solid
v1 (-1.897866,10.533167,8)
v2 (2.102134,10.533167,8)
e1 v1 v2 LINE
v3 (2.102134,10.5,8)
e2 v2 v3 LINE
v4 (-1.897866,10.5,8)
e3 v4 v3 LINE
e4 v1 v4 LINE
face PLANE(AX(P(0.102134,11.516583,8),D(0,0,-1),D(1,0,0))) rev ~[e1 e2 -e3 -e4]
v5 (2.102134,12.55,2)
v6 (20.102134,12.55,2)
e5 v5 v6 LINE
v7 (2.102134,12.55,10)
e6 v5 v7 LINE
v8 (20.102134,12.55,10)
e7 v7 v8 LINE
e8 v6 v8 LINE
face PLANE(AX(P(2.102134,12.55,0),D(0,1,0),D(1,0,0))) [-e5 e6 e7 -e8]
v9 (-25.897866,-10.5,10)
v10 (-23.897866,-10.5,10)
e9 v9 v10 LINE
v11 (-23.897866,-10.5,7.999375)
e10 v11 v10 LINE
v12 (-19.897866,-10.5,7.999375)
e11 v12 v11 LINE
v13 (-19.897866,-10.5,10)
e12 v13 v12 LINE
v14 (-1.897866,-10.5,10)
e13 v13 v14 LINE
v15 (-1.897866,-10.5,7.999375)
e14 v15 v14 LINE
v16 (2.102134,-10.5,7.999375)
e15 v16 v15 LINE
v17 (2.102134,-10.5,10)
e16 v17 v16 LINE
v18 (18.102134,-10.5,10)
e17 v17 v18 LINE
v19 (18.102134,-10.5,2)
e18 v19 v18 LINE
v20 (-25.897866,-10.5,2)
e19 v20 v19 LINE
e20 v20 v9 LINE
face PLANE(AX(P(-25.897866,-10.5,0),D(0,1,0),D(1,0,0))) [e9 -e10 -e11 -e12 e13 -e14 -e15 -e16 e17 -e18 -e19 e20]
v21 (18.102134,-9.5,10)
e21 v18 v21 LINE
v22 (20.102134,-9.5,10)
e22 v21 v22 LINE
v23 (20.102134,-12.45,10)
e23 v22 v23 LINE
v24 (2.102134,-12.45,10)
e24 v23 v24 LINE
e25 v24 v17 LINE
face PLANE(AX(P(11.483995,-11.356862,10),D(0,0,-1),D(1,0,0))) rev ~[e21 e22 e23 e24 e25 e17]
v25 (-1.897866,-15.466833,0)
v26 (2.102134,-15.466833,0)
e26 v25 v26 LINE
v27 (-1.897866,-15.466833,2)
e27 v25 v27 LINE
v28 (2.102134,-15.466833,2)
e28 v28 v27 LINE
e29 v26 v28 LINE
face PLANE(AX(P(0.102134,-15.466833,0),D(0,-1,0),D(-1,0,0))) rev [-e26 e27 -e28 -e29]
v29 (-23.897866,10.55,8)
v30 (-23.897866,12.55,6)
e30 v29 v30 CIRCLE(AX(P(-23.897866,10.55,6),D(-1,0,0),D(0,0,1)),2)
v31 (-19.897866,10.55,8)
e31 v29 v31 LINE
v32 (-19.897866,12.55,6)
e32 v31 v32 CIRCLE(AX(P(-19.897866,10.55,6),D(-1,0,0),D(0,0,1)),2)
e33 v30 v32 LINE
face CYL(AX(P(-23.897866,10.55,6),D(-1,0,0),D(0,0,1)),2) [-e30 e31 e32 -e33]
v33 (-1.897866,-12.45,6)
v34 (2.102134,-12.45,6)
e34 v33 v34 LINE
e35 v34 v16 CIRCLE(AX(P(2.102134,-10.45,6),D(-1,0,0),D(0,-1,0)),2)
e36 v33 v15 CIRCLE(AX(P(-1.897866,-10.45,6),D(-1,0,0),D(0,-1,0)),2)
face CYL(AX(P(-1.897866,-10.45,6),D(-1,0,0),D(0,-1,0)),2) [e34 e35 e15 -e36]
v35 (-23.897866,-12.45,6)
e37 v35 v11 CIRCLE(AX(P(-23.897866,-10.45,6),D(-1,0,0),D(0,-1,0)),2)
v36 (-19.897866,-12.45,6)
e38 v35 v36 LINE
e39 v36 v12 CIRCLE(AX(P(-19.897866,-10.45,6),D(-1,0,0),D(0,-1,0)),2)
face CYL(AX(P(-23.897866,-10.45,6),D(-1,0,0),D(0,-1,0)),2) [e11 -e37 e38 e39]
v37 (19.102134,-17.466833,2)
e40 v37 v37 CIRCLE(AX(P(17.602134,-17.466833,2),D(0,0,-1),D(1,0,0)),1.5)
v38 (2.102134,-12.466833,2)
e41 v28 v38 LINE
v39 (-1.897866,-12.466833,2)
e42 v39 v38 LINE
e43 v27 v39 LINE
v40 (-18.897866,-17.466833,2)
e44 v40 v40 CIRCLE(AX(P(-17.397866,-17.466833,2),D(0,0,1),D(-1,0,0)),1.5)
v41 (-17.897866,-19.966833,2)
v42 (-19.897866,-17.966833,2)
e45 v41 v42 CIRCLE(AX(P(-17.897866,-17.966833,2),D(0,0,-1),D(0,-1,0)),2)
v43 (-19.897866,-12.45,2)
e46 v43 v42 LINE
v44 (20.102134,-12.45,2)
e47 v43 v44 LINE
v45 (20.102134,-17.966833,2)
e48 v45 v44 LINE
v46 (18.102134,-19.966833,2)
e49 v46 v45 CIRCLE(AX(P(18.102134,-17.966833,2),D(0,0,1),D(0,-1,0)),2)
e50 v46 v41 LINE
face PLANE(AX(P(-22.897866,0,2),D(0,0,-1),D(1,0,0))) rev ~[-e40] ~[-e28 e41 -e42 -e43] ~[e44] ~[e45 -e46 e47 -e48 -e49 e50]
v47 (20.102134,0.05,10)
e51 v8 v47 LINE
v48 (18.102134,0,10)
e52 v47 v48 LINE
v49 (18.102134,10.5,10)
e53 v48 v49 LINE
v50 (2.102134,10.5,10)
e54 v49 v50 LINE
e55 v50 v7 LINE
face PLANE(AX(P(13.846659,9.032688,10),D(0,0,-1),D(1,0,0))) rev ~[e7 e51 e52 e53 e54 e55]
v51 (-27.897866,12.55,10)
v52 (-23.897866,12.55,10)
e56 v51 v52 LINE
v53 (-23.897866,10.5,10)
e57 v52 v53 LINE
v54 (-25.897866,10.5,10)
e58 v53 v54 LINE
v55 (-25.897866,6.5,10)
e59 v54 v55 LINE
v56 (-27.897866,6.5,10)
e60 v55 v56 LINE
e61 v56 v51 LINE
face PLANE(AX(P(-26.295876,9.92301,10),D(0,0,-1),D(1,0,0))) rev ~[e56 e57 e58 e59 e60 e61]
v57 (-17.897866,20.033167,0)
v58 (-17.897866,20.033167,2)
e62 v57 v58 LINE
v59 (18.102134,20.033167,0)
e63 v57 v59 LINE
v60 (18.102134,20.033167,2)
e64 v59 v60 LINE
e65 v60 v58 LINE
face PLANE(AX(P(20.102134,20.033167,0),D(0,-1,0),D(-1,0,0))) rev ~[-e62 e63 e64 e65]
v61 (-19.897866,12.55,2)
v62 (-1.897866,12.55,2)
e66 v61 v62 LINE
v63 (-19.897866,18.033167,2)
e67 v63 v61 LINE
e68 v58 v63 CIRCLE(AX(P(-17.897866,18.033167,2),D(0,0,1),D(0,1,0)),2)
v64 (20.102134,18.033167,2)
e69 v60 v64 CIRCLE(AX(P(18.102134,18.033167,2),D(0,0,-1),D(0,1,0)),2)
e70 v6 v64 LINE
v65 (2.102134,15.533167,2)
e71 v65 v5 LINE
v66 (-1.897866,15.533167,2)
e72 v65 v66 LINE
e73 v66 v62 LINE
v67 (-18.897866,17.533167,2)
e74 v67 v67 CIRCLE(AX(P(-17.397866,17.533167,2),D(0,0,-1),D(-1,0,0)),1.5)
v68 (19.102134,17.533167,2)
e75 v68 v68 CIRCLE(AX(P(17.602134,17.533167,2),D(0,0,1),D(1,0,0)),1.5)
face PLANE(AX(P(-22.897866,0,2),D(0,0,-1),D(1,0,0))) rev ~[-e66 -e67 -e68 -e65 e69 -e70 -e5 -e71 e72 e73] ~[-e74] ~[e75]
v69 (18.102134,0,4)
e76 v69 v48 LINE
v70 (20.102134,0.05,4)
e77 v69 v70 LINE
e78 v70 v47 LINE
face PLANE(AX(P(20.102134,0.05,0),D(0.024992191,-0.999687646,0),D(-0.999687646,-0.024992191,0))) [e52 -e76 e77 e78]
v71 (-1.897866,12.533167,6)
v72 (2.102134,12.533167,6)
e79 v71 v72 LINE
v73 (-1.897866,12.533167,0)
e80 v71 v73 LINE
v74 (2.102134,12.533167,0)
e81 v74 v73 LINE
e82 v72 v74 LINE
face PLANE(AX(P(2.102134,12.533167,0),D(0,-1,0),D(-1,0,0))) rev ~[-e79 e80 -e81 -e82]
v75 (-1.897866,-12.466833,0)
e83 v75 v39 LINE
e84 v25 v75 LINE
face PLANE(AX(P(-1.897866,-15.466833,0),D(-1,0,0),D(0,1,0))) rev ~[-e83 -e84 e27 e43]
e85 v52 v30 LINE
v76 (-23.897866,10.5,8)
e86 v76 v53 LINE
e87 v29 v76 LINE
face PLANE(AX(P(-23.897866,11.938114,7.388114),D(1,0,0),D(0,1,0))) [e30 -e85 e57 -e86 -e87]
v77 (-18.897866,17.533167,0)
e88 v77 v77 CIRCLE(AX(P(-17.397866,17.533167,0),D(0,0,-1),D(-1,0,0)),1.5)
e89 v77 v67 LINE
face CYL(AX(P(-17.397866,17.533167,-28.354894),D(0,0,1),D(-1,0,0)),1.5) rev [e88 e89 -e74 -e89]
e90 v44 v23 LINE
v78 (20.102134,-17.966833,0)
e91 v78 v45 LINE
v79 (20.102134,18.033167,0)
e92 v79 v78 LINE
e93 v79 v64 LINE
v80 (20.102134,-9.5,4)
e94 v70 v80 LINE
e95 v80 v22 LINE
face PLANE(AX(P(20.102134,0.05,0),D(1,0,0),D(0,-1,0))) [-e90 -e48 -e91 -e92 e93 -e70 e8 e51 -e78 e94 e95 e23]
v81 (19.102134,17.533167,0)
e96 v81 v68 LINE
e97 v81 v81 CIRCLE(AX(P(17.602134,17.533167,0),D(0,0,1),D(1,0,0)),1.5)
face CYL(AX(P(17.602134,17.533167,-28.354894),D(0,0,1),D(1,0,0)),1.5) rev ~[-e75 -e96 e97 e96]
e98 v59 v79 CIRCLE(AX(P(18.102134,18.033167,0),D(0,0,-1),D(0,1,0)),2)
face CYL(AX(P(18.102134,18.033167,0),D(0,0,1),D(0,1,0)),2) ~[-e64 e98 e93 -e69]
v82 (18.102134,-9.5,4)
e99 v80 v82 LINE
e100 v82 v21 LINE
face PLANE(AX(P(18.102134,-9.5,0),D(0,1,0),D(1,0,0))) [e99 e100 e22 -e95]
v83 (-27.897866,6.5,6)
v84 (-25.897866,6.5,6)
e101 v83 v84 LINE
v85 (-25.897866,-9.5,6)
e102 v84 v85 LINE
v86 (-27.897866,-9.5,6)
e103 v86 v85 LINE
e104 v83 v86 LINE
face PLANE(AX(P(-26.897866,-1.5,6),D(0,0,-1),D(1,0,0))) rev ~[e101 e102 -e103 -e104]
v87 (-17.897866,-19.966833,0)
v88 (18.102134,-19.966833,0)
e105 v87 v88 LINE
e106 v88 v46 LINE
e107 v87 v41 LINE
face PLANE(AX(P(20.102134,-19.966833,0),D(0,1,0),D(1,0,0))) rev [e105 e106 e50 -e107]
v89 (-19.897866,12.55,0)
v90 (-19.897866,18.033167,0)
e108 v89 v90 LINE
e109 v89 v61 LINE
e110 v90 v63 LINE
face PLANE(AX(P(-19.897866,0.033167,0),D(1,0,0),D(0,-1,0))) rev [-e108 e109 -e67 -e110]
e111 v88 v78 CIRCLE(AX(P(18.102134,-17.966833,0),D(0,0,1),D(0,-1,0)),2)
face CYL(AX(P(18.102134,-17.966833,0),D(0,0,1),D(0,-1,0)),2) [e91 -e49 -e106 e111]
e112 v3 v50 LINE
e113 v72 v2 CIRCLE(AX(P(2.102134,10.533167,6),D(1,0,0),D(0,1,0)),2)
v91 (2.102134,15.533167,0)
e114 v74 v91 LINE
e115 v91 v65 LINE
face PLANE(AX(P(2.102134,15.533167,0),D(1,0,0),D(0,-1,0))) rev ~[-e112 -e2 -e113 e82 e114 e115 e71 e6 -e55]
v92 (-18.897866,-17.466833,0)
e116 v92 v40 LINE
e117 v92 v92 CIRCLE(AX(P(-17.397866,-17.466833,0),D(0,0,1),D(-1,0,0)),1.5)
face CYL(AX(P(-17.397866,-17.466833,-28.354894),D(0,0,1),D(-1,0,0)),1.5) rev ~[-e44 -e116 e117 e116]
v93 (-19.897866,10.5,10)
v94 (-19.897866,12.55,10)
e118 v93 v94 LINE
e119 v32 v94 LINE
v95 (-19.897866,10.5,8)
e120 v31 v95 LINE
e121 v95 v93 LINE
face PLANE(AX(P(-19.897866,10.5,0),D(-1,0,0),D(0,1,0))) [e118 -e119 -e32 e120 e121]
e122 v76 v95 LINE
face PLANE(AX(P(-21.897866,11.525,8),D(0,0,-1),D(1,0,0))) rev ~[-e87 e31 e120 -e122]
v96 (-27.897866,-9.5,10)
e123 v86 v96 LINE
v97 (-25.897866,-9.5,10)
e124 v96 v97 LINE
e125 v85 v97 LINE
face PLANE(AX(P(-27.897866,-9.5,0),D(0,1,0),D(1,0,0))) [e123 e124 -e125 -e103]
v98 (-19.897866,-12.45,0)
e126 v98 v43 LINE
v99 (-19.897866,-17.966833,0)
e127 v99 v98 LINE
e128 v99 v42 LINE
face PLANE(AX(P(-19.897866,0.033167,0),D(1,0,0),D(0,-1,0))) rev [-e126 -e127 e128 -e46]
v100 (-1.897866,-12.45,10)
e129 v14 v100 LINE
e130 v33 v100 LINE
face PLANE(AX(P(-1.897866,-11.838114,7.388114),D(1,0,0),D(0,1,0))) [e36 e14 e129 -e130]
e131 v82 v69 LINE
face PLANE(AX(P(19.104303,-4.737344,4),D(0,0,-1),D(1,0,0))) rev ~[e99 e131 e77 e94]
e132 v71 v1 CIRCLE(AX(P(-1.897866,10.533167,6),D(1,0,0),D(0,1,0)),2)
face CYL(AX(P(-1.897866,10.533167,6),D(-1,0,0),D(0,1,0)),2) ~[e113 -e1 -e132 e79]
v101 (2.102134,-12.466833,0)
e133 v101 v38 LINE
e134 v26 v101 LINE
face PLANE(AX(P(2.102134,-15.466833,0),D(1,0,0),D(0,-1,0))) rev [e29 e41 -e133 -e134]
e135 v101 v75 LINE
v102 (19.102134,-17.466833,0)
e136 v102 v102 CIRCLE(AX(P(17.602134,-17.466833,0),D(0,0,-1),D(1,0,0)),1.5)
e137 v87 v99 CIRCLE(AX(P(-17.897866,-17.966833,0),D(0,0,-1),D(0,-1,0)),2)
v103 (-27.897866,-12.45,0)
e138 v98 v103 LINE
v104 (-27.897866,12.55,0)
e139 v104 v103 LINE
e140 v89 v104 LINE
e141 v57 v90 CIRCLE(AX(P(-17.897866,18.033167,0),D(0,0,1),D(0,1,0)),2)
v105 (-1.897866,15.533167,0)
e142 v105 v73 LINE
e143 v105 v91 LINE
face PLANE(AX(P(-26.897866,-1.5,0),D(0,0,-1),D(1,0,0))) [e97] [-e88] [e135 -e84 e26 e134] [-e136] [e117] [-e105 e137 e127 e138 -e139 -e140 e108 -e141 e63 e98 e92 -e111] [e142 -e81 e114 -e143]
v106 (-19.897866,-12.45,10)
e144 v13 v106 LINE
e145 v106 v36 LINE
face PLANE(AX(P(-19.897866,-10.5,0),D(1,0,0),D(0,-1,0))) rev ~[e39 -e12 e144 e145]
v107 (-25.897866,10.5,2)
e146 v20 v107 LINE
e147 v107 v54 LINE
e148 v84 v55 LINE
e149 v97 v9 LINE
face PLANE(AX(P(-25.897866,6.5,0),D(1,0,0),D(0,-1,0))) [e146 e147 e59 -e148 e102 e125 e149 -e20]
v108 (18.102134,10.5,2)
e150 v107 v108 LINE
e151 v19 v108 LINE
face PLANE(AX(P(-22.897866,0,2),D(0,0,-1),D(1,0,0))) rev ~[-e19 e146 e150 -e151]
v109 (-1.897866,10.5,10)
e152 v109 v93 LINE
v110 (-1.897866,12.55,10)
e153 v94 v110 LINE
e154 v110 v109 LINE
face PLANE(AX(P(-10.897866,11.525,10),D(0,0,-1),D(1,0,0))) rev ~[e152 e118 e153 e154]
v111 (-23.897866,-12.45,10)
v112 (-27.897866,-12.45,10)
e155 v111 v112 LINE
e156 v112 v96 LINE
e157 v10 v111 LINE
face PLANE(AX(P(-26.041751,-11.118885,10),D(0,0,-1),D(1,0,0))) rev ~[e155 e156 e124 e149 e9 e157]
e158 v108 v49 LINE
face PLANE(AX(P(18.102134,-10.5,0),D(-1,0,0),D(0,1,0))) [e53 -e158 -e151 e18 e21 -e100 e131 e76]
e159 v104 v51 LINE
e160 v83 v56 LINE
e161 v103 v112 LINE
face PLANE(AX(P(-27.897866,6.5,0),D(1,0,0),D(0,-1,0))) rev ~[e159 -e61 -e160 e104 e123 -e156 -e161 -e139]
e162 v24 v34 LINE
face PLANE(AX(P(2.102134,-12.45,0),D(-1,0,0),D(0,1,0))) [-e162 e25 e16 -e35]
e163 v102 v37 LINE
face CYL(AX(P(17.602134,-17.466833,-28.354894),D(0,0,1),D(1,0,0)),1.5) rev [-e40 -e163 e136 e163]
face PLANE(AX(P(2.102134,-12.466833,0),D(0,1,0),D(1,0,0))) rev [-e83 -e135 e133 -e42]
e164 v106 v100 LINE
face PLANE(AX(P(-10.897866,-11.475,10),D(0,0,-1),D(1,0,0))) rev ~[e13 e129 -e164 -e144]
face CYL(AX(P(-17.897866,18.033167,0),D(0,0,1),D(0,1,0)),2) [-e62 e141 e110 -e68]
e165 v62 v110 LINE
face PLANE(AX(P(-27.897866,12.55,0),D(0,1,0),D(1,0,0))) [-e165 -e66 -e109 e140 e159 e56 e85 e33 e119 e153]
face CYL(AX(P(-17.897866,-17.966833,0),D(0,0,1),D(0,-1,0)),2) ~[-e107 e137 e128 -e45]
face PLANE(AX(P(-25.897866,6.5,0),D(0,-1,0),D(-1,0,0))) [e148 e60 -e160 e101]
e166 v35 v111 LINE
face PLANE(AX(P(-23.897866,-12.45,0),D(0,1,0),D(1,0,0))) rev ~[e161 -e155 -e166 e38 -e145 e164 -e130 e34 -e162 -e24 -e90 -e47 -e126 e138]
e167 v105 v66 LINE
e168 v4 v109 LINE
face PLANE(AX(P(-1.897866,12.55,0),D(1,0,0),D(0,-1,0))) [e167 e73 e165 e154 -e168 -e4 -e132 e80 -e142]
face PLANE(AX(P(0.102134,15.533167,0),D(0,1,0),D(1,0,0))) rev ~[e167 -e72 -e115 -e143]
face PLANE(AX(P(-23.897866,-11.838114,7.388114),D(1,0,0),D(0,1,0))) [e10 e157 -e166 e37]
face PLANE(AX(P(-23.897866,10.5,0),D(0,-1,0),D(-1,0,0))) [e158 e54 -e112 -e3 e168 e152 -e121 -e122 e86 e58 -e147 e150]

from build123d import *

# Parameters (mm, degrees)
F1_DEPTH     = 2
F2_R         = 2
F3_D         = 3
F7_DEPTH     = 2
F6_W         = 4
F6_H         = 1.95
F6_H_2       = 2.05
F6_H_3       = 2.0331665652
F8_DEPTH     = 8
F6_W_2       = 18
F9_DEPTH     = 10
F10_T1_DEPTH = 4
F10_T3_DEPTH = 4
F11_DEPTH    = 4
F6_W_3       = 2
F6_H_4       = 16
F12_DEPTH    = 6


# Not quite as in the source:
# - a fillet or chamfer that OpenCascade refuses, or shapes differently, is made with other operations: its cross-section is extruded or revolved along the edge and cut away or added


with BuildPart() as f1:
    # F0 (on Top) → F1 (new body)
    with BuildSketch(Plane.XY):
        Polygon((-19.8978664808, -19.9668334348), (0.1021335192, -19.9668334348), (0.1021335192, -15.4668334348), (-1.8978664808, -15.4668334348), (-1.8978664808, -12.4668334348), (0.1021335192, -12.4668334348), (0.1021335192, 0.0331665652), (-19.8978664808, 0.0331665652), align=None)
    extrude(amount=F1_DEPTH)

    # F2
    f2_edges = [f1.edges().sort_by_distance(p)[0] for p in [
        (-19.897866, -19.966833, 1),
    ]]
    fillet(f2_edges, radius=F2_R)

    # F3 (through all)
    with Locations(Plane(origin=(0, 0, 0), x_dir=(1, 0, 0), z_dir=(0, 0, -1))):
        with Locations((-17.3978664808, 17.4668334348)):
            Hole(F3_D / 2)

    # F4: F1 across face


with BuildPart() as f1_1:
    add(f1.part)
    add(f1.part.mirror(Plane(origin=(0.1021335192, -6.2168334348, 1), x_dir=(0, 1, 0), z_dir=(1, 0, 0))))

    # F5: F1 across face


with BuildPart() as f1_2:
    add(f1_1.part)
    add(f1_1.part.mirror(Plane(origin=(0.1021335192, 0.0331665652, 1), x_dir=(-1, 0, 0), z_dir=(0, 1, 0))))

    # F6 (on face) → F7 (join)
    with BuildSketch(Plane(origin=(0, 0, 0), x_dir=(1, 0, 0), z_dir=(0, 0, -1))):
        Polygon((-25.8978664808, -10.5), (-23.8978664808, -10.5), (-19.8978664808, -10.5), (-19.8978664808, 10.5), (-23.8978664808, 10.5), (-25.8978664808, 10.5), (-25.8978664808, 9.5), (-25.8978664808, -6.5), align=None)
        Polygon((18.1021335192, 0), (20.1021335192, -0.05), (20.1021335192, 9.5), (18.1021335192, 9.5), align=None)
        Polygon((-19.8978664808, 10.5), (-19.8978664808, -10.5), (-1.8978664808, -10.5), (2.1021335192, -10.5), (18.1021335192, -10.5), (18.1021335192, 0), (18.1021335192, 9.5), (18.1021335192, 10.5), (2.1021335192, 10.5), (-1.8978664808, 10.5), align=None)
    extrude(amount=-F7_DEPTH)

    # F6 (on face) → F8 (join)
    with BuildSketch(Plane(origin=(0, 0, 0), x_dir=(1, 0, 0), z_dir=(0, 0, -1))):
        with Locations((-21.8978664808, 11.475)):
            Rectangle(F6_W, F6_H)
        with Locations((-21.8978664808, -11.525)):
            Rectangle(F6_W, F6_H_2)
        with Locations((0.1021335192, -11.5165832826)):
            Rectangle(F6_W, F6_H_3)
        with Locations((0.1021335192, 11.475)):
            Rectangle(F6_W, F6_H)
    extrude(amount=-F8_DEPTH)

    # F6 (on face) → F9 (join)
    with BuildSketch(Plane(origin=(0, 0, 0), x_dir=(1, 0, 0), z_dir=(0, 0, -1))):
        Polygon((-27.8978664808, -12.55), (-23.8978664808, -12.55), (-23.8978664808, -10.5), (-25.8978664808, -10.5), (-25.8978664808, -6.5), (-27.8978664808, -6.5), align=None)
        Polygon((-27.8978664808, 12.45), (-27.8978664808, 9.5), (-25.8978664808, 9.5), (-25.8978664808, 10.5), (-23.8978664808, 10.5), (-23.8978664808, 12.45), align=None)
        Polygon((-19.8978664808, -10.5), (-19.8978664808, -12.55), (-1.8978664808, -12.55), (-1.8978664808, -12.5331665652), (-1.8978664808, -10.5), align=None)
        Polygon((2.1021335192, -12.5331665652), (2.1021335192, -12.55), (20.1021335192, -12.55), (20.1021335192, -0.05), (18.1021335192, 0), (18.1021335192, -10.5), (2.1021335192, -10.5), align=None)
        Polygon((2.1021335192, 12.45), (2.1021335192, 10.5), (18.1021335192, 10.5), (18.1021335192, 9.5), (20.1021335192, 9.5), (20.1021335192, 12.45), align=None)
        with Locations((-10.8978664808, 11.475)):
            Rectangle(F6_W_2, F6_H)
    extrude(amount=-F9_DEPTH)

    # F10: fillet of radius 2 on 4 edges, made by hand

    # F10_s2 → F10_t1 (cut)
    with BuildSketch(Plane.YZ.offset(-23.8978664808)):
        with BuildLine():
            ThreePointArc((10.55, 8), (11.9642135624, 7.4142135624), (12.55, 6))
            Line((12.55, 6), (12.55, 8))
            Line((12.55, 8), (10.55, 8))
        make_face()
        with BuildLine():
            ThreePointArc((-12.45, 6), (-11.8642135624, 7.4142135624), (-10.45, 8))
            Line((-10.45, 8), (-12.45, 8))
            Line((-12.45, 8), (-12.45, 6))
        make_face()
    extrude(amount=F10_T1_DEPTH, mode=Mode.SUBTRACT)

    # F10_s4 → F10_t3 (cut)
    with BuildSketch(Plane.YZ.offset(-1.8978664808)):
        with BuildLine():
            ThreePointArc((-12.45, 6), (-11.8642135624, 7.4142135624), (-10.45, 8))
            Line((-10.45, 8), (-12.45, 8))
            Line((-12.45, 8), (-12.45, 6))
        make_face()
        with BuildLine():
            ThreePointArc((12.5331665652, 6), (11.9473801276, 7.4142135624), (10.5331665652, 8))
            Line((10.5331665652, 8), (12.5331665652, 8))
            Line((12.5331665652, 8), (12.5331665652, 6))
        make_face()
    extrude(amount=F10_T3_DEPTH, mode=Mode.SUBTRACT)

    # F6 (on face) → F11 (join)
    with BuildSketch(Plane(origin=(0, 0, 0), x_dir=(1, 0, 0), z_dir=(0, 0, -1))):
        Polygon((18.1021335192, 0), (20.1021335192, -0.05), (20.1021335192, 9.5), (18.1021335192, 9.5), align=None)
    extrude(amount=-F11_DEPTH)

    # F6 (on face) → F12 (join)
    with BuildSketch(Plane(origin=(0, 0, 0), x_dir=(1, 0, 0), z_dir=(0, 0, -1))):
        with Locations((-26.8978664808, 1.5)):
            Rectangle(F6_W_3, F6_H_4)
    extrude(amount=-F12_DEPTH)


solid = f1_2.part
